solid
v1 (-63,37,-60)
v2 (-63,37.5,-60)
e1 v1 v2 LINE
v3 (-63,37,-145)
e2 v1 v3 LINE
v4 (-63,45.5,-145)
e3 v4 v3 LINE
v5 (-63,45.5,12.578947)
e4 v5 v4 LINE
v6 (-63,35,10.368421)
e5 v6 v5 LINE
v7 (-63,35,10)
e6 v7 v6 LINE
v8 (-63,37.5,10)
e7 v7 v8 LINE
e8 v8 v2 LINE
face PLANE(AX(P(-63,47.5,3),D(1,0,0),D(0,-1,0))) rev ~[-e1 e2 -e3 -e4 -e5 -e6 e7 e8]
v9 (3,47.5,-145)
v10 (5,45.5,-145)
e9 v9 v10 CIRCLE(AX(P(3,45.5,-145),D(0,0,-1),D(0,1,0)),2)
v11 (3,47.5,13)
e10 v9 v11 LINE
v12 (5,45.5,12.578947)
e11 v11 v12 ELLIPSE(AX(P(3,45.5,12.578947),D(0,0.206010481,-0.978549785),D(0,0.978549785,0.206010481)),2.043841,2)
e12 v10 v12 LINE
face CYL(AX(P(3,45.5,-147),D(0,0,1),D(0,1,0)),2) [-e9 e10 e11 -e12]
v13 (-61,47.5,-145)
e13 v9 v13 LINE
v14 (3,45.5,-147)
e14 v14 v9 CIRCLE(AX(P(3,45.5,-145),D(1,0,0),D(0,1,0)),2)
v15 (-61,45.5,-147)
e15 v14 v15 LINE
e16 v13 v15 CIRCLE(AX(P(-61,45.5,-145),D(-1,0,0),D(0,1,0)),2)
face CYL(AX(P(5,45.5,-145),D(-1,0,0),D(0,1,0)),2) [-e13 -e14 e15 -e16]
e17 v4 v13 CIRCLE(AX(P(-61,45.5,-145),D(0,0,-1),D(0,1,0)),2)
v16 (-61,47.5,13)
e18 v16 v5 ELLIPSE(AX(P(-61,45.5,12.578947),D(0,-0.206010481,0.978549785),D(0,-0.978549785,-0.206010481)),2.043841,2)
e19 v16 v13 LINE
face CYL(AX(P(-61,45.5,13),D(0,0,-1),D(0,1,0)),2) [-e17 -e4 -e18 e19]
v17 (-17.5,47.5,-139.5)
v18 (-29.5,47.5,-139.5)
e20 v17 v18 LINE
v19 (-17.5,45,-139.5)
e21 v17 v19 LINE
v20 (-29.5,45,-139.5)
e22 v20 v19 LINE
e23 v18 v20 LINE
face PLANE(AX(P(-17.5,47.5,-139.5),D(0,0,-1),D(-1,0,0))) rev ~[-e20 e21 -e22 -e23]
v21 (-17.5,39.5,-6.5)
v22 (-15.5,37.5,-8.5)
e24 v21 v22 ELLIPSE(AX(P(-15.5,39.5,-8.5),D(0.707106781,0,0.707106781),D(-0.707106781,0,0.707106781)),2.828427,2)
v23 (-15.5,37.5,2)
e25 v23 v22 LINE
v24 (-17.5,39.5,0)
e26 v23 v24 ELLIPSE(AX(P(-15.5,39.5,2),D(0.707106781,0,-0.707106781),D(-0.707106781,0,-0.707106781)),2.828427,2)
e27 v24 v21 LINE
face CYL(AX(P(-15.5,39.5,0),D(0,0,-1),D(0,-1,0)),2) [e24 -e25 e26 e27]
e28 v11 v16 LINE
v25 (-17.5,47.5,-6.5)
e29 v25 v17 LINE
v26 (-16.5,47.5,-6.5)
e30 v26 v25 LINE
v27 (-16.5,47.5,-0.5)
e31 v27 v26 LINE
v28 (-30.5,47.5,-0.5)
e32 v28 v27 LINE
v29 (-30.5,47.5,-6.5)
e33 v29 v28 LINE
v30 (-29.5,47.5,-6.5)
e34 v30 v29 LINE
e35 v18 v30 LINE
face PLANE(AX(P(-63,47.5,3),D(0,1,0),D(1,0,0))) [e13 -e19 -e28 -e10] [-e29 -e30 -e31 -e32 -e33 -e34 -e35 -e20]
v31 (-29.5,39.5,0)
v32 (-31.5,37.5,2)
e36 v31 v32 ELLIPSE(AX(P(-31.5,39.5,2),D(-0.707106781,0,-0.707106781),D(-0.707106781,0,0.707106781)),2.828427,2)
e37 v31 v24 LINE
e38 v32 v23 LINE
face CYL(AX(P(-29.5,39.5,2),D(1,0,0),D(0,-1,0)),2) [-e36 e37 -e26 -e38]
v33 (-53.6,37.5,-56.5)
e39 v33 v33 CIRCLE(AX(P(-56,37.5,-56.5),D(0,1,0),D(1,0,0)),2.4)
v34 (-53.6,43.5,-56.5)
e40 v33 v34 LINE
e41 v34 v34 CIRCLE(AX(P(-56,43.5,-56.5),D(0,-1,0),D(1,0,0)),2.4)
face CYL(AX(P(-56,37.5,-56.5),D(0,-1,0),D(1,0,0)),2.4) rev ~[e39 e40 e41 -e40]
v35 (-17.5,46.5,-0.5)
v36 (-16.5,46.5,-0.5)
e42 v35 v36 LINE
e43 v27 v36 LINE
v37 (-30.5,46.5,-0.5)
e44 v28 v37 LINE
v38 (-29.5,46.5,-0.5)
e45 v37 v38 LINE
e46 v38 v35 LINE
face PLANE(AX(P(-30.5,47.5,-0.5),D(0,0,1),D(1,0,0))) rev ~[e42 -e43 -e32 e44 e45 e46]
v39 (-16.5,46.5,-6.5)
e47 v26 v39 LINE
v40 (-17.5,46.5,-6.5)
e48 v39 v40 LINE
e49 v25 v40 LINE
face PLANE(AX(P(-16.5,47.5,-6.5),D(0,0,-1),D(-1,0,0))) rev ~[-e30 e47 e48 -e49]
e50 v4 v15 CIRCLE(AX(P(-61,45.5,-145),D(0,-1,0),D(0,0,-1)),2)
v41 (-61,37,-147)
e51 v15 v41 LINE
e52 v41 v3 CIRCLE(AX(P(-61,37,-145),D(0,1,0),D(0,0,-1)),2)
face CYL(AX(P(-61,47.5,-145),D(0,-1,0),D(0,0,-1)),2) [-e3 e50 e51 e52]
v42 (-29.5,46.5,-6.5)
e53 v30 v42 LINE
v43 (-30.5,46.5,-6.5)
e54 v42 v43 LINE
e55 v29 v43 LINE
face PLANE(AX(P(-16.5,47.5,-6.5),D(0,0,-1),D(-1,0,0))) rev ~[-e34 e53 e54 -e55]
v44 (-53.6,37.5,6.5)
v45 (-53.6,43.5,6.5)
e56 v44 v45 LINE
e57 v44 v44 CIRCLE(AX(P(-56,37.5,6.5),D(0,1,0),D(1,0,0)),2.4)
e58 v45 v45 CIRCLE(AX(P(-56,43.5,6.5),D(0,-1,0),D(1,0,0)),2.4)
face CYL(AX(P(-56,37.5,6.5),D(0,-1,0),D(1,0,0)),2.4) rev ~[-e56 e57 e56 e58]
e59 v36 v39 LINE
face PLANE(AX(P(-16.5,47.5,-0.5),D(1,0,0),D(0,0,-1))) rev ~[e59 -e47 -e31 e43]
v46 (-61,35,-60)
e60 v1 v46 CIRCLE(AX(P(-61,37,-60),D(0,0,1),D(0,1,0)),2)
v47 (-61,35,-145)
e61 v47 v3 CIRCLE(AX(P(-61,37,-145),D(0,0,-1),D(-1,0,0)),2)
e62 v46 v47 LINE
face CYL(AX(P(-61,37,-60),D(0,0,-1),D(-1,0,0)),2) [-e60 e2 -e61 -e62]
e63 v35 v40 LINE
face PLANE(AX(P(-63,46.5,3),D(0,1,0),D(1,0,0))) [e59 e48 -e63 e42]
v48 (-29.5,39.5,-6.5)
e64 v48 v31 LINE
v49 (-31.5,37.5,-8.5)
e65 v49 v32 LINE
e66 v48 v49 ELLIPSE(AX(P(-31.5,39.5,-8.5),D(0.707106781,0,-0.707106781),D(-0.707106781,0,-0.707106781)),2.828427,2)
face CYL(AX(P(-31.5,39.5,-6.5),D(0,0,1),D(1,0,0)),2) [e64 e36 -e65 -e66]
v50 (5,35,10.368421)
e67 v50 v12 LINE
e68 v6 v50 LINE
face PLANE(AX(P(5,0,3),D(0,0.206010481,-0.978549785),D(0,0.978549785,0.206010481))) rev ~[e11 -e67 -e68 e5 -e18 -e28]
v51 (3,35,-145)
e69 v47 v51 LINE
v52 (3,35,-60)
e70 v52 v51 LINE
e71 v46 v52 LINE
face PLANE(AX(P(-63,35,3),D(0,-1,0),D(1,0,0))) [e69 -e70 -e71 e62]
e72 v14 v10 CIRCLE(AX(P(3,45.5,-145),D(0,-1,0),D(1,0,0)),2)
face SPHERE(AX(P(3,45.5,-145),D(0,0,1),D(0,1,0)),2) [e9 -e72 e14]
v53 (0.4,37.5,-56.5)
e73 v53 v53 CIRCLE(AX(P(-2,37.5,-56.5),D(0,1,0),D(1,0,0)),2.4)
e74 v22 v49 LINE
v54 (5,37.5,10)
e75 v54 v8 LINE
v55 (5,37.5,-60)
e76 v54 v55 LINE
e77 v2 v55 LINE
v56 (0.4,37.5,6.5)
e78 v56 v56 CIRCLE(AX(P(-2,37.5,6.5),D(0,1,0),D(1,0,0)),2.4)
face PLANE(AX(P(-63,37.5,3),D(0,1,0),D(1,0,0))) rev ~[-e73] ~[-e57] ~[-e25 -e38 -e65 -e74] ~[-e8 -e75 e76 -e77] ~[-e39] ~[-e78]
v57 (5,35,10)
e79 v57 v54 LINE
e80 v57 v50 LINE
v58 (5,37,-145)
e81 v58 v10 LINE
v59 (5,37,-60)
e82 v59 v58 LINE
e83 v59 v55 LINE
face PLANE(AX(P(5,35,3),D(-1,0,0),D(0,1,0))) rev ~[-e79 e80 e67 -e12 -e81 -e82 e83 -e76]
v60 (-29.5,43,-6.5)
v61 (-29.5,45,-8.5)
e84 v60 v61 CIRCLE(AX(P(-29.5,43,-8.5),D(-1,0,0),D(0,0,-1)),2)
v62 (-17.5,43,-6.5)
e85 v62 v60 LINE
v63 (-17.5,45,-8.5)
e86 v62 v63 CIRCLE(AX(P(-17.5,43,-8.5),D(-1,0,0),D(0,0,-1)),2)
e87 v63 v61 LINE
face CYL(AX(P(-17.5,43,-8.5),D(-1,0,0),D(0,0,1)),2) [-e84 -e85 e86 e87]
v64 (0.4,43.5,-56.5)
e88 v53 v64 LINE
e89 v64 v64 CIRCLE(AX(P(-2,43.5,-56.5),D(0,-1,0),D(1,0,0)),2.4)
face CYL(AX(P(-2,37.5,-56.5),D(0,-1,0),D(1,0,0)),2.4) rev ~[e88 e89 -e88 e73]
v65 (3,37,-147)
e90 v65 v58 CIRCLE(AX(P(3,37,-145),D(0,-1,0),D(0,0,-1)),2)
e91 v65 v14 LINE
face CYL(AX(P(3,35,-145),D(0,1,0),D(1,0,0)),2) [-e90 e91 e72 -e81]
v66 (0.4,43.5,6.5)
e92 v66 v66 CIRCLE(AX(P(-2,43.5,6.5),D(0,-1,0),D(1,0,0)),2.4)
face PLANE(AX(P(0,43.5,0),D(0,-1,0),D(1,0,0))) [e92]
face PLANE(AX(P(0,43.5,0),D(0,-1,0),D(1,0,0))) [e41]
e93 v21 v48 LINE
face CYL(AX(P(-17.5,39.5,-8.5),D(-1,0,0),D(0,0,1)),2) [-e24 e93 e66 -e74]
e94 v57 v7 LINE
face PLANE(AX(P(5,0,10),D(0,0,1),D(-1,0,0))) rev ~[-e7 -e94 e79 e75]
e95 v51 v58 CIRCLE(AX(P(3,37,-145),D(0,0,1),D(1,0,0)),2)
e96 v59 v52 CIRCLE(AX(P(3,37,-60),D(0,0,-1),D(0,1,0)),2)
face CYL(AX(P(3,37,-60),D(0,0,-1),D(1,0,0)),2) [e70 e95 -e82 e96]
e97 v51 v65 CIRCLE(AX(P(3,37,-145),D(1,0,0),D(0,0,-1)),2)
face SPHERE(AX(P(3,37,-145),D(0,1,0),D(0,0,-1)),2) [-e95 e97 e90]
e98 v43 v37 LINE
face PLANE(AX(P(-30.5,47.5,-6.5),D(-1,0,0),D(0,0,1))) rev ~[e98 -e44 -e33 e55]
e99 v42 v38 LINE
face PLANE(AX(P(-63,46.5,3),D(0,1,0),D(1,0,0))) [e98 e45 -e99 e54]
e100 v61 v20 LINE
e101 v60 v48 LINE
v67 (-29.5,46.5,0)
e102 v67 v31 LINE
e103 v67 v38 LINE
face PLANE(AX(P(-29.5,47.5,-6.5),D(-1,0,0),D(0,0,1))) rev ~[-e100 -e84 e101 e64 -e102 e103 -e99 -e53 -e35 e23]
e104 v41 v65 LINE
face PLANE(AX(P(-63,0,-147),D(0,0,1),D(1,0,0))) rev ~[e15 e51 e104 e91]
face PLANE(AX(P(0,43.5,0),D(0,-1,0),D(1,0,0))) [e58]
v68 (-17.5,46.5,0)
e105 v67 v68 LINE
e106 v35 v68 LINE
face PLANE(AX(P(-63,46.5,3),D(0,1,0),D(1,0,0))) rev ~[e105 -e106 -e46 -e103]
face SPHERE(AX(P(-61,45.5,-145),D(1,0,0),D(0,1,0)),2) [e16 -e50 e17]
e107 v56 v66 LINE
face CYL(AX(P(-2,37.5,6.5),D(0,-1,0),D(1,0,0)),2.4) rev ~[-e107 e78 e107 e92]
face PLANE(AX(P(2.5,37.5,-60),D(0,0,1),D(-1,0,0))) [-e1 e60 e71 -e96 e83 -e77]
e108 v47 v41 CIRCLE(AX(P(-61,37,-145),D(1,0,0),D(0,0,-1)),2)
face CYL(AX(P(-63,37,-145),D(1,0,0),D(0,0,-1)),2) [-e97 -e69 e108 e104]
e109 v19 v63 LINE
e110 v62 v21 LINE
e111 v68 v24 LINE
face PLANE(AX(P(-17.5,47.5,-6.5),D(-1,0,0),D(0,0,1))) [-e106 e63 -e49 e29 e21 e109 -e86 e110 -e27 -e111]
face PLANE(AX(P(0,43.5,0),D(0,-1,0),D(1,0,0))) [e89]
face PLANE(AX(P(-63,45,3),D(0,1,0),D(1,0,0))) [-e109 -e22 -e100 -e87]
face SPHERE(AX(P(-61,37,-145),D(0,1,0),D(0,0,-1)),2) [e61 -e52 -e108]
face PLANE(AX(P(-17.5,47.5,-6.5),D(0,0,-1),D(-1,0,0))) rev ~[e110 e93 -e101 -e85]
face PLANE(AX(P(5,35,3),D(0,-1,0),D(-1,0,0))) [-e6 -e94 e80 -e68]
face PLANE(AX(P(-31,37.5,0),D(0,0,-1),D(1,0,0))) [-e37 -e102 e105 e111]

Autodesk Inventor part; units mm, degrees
ref_plane "YZ Plane" through (0, 0, 0) normal (1, 0, 0) x (0, 1, 0)
ref_plane "XZ Plane" through (0, 0, 0) normal (0, 1, 0) x (-1, 0, 0)
ref_plane "XY Plane" through (0, 0, 0) normal (0, 0, 1) x (1, 0, 0)
sketch "Эскиз1" plane through (0, 0, 0) normal (0, 1, 0) x (-1, 0, 0)
  line L0 (0, -50) -> (58, -50)
  line L1 (-2, -2) -> (-2, -48)
  line L2 (58, 0) -> (0, 0)
  line L3 (60, -48) -> (60, -2)
  line L4 (-2, 0) -> (60, 0)
  line L5 (60, 0) -> (60, -50)
  line L6 (60, -50) -> (-2, -50)
  line L7 (-2, -50) -> (-2, 0)
  circle A0 centre (2, -4) radius 1.6
  circle A1 centre (55, -4) radius 1.6
  circle A2 centre (55, -46) radius 1.6
  circle A3 centre (2, -46) radius 1.6
  circle A4 centre (2, -4) radius 1.6
  circle A5 centre (55, -4) radius 1.6
  circle A6 centre (55, -46) radius 1.6
  circle A7 centre (2, -46) radius 1.6
  circle A8 centre (2, -4) radius 2.4
  circle A9 centre (2, -4) radius 4
  circle A10 centre (55, -4) radius 4
  circle A11 centre (55, -4) radius 2.4
  circle A12 centre (55, -46) radius 4
  circle A13 centre (55, -46) radius 2.4
  circle A14 centre (2, -46) radius 4
  circle A15 centre (2, -46) radius 2.4
  dimension "d0" = 4.8
  dimension "d1" = 8
  dimension "d2" = 4.8
  dimension "d3" = 8
  dimension "d4" = 4.8
  dimension "d5" = 8
  dimension "d6" = 4.8
  dimension "d7" = 8
extrude "Выдавливание1" add sketch "Эскиз1" along normal blind 2.5 contours L6 L7 L1 A14 L0 | A12 | A10 | A14 L1 A9 L2 L4 L5 L3 L6 L0 | A14 | L1 L7 L4 L2 A9 | A9 | A0 | A1 | A2 | A3 | A8 | A11 | A13 | A15
extrude "Выдавливание2" add sketch "Эскиз1" along normal blind 8.5 contours A12 | A10 | A14 | A9
sketch "Эскиз2" plane through (0, 0, 0) normal (0, -1, 0) x (1, 0, 0)
  line L0 (-60, 0) -> (2, 0) projected
  line L1 (2, 0) -> (2, -50) projected
  line L2 (2, -50) -> (-60, -50) projected
  line L3 (-60, -50) -> (-60, 0) projected
  line L4 (2, 0) -> (2, -50) projected
  line L5 (2.5, -50.5) -> (-60.5, -50.5)
  line L6 (-60.5, -50.5) -> (-60.5, 0.5)
  line L7 (-60.5, 0.5) -> (2.5, 0.5)
  line L8 (2.5, 0.5) -> (2.5, -50.5)
  line L9 (5, -50.5) -> (5, -53)
  line L10 (5, -53) -> (2.5, -53)
  line L11 (5, -53) -> (-63, -53)
  line L12 (-63, -53) -> (-63, 3)
  line L13 (-63, 3) -> (5, 3)
  line L14 (5, 3) -> (5, -53)
  point P0 (0, 0)
  dimension "d14" = 63
  dimension "d15" = 51
  dimension "d16" = 2.5
  dimension "d17" = 2.5
  dimension "d18" = 68
  dimension "d19" = 56
extrude "Выдавливание3" add sketch "Эскиз2" against normal blind 2.5 contours L5 L6 L7 L8
extrude "Выдавливание4" add sketch "Эскиз2" against normal blind 35 contours L9 L10 L11 L12 L13 L14
sketch "Эскиз3" plane through (-63, 0, 3) normal (0, 0, 1) x (1, 0, 0)
  line L0 (0, 0) -> (0, 35) projected
  line L1 (0, 35) -> (68, 35)
  line L2 (68, 35) -> (68, 50)
  line L3 (68, 50) -> (0, 50)
  line L4 (0, 50) -> (0, 35)
  point P0 (63, 0)
  dimension "d24" = 15
extrude "Выдавливание5" add sketch "Эскиз3" against normal blind 150
sketch "Эскиз4" plane through (-63, 50, 3) normal (0, 1, 0) x (1, 0, 0)
  line L0 (0, 0) -> (0, 56) projected
  line L1 (68, 0) -> (68, 150) projected
  line L2 (0, 0) -> (68, 0)
  line L3 (68, 0) -> (68, 150)
  line L4 (68, 150) -> (0, 150)
  line L5 (0, 150) -> (0, 0)
  point P0 (63, 3)
extrude "Выдавливание6" cut sketch "Эскиз4" against normal blind 2.5
sketch "Эскиз5" plane through (-63, 47.5, 3) normal (0, 1, 0) x (1, 0, 0)
  line L0 (0, 56) -> (0, 150) projected
  line L1 (0, 150) -> (10, 150)
  line L2 (10, 150) -> (10, 140)
  line L3 (10, 140) -> (0, 140)
  line L4 (0, 140) -> (0, 150)
  line L5 (68, 150) -> (0, 150) projected
  line L6 (68, 150) -> (58, 150)
  line L7 (58, 150) -> (58, 140)
  line L8 (58, 140) -> (68, 140)
  line L9 (68, 140) -> (68, 150)
  line L10 (0, 0) -> (0, 56) projected
  line L11 (0, 0) -> (10, 0)
  line L12 (10, 0) -> (10, 10)
  line L13 (10, 10) -> (0, 10)
  line L14 (0, 10) -> (0, 0)
  line L15 (10, 10) -> (58, 10)
  line L16 (58, 10) -> (58, 140)
  line L17 (58, 140) -> (10, 140)
  line L18 (10, 140) -> (10, 10)
  point P0 (63, 3)
  dimension "d29" = 10
  dimension "d30" = 10
  dimension "d31" = 10
  dimension "d32" = 10
  dimension "d33" = 10
  dimension "d34" = 10
extrude "Выдавливание7" cut sketch "Эскиз5" against normal blind 10 contours L17 L16 L15 L18
sketch "Эскиз6" plane through (-63, 37.5, 3) normal (0, 1, 0) x (1, 0, 0)
  line L0 (58, 140) -> (10, 140) projected
  line L1 (10, 140) -> (10, 10) projected
  line L2 (10, 10) -> (58, 10) projected
  line L3 (58, 10) -> (58, 140) projected
  line L4 (0, 150) -> (68, 150) projected
  line L5 (68, 150) -> (68, 0) projected
  line L6 (68, 0) -> (0, 0) projected
  line L7 (0, 0) -> (0, 150) projected
  line L8 (68, 56) -> (0, 56) projected
  line L9 (0, 56) -> (10, 56)
  line L10 (10, 56) -> (10, 46)
  line L11 (10, 46) -> (0, 46)
  line L12 (0, 46) -> (0, 56)
  line L13 (10, 46) -> (58, 46)
  line L14 (58, 46) -> (58, 10)
  line L15 (58, 10) -> (10, 10)
  line L16 (10, 10) -> (10, 46)
  point P0 (63, 3)
  dimension "d37" = 10
  dimension "d38" = 10
extrude "Выдавливание8" cut sketch "Эскиз6" against normal blind 10 contours L3 L2 L1 L13
sketch "Эскиз7" plane through (-63, 47.5, 3) normal (0, 1, 0) x (1, 0, 0)
  line L0 (0, 0) -> (0, 150) projected
  line L1 (0, 150) -> (2.5, 150)
  line L2 (2.5, 150) -> (2.5, 147.5)
  line L3 (2.5, 147.5) -> (0, 147.5)
  line L4 (0, 147.5) -> (0, 150)
  line L5 (68, 150) -> (68, 0) projected
  line L6 (68, 150) -> (65.5, 150)
  line L7 (65.5, 150) -> (65.5, 147.5)
  line L8 (65.5, 147.5) -> (68, 147.5)
  line L9 (68, 147.5) -> (68, 150)
  line L10 (2.5, 2.5) -> (2.5, 53.5) projected
  line L11 (65.5, 147.5) -> (2.5, 147.5)
  line L12 (2.5, 147.5) -> (2.5, 10)
  line L13 (2.5, 10) -> (65.5, 10)
  line L14 (65.5, 10) -> (65.5, 147.5)
  point P0 (63, 3)
  dimension "d41" = 2.5
  dimension "d42" = 2.5
  dimension "d43" = 2.5
  dimension "d44" = 2.5
  dimension "d45" = 137.5
extrude "Выдавливание9" cut sketch "Эскиз7" against normal blind 10 contours L11 L14 L13 L10 L12
sketch "Эскиз8" plane through (-63, 37.5, 3) normal (0, 1, 0) x (1, 0, 0)
  line L0 (58, 10) -> (58, 46) projected
  line L1 (58, 46) -> (10, 46) projected
  line L2 (10, 46) -> (10, 10) projected
  line L3 (2.5, 10) -> (10, 10) projected
  line L4 (2.5, 147.5) -> (2.5, 10) projected
  line L5 (65.5, 147.5) -> (2.5, 147.5) projected
  line L6 (65.5, 10) -> (65.5, 147.5) projected
  line L7 (58, 10) -> (65.5, 10) projected
  line L8 (10, 10) -> (58, 10) projected
  line L9 (0, 150) -> (68, 150) projected
  line L10 (68, 150) -> (68, 0) projected
  line L11 (68, 0) -> (0, 0) projected
  line L12 (0, 0) -> (0, 150) projected
  circle A0 centre (8, 49) radius 2.4 projected
  line L13 (2.5, 53.5) -> (65.5, 53.5) projected
  line L14 (65.5, 147.5) -> (65.5, 10) projected
  circle A1 centre (61, 49) radius 4 projected
  circle A2 centre (8, 7) radius 4 projected
  circle A3 centre (8, 49) radius 4 projected
  line L15 (2.5, 2.5) -> (65.5, 2.5) projected
  line L16 (65.5, 2.5) -> (65.5, 53.5) projected
  line L17 (65.5, 53.5) -> (2.5, 53.5) projected
  line L18 (2.5, 53.5) -> (2.5, 2.5) projected
  circle A4 centre (61, 7) radius 4 projected
  circle A5 centre (8, 7) radius 4 projected
  line L19 (2.5, 2.5) -> (2.5, 53.5) projected
  line L20 (65.5, 2.5) -> (2.5, 2.5) projected
  line L21 (65.5, 53.5) -> (65.5, 2.5) projected
  circle A6 centre (61, 7) radius 2.4 projected
  line L22 (2.5, 53.5) -> (65.5, 53.5)
  line L23 (65.5, 53.5) -> (65.5, 2.5)
  line L24 (65.5, 2.5) -> (2.5, 2.5)
  line L25 (2.5, 2.5) -> (2.5, 53.5)
  point P0 (63, 3)
  point P1 (58.3542, 10)
  point P2 (63.6458, 10)
  point P3 (10.6458, 10)
  point P4 (10, 10.4641)
  point P5 (10, 45.5359)
  point P6 (10.6458, 46)
extrude "Выдавливание10" cut sketch "Эскиз8" along normal mid plane 20 contours L0 L1 A3 L2 A2 L3 L4 L13 L6 L7 A4 | L7 A4 L16 L15 L18 L3 A2 L8 | A4 L7 | L7 A4 | A2 L3 L8 | L8 L2 A2 | A3 L2 L1 | L1 L2 A3 | L3 A2 L2 | A0 | A1 | A6
sketch "Эскиз9" plane through (-63, 0, 3) normal (0, 0, 1) x (1, 0, 0)
  line L0 (68, 0) -> (68, 47.5) projected
  line L1 (68, 35) -> (0, 35) projected
  line L2 (68, 47.5) -> (0, 47.5)
  line L3 (0, 47.5) -> (0, 35)
  line L4 (0, 35) -> (68, 35)
  line L5 (68, 35) -> (68, 47.5)
  point P0 (63, 0)
extrude "Выдавливание11" add sketch "Эскиз9" along normal blind 10
sketch "Эскиз12" plane through (-63, 37.5, 3) normal (0, 1, 0) x (1, 0, 0)
  line L0 (65.5, 2.5) -> (65.5, 53.5) projected
  line L1 (65.5, 53.5) -> (55.5, 53.5)
  line L2 (55.5, 53.5) -> (55.5, 63.5)
  line L3 (55.5, 63.5) -> (65.5, 63.5)
  line L4 (65.5, 63.5) -> (65.5, 53.5)
  line L5 (2.5, 53.5) -> (2.5, 2.5) projected
  line L6 (2.5, 53.5) -> (12.5, 53.5)
  line L7 (12.5, 53.5) -> (12.5, 63.5)
  line L8 (12.5, 63.5) -> (2.5, 63.5)
  line L9 (2.5, 63.5) -> (2.5, 53.5)
  point P0 (63, 3)
  dimension "d52" = 10
  dimension "d53" = 10
  dimension "d54" = 10
extrude "Выдавливание12" add sketch "Эскиз12" along normal blind 10
sketch "Эскиз16" plane through (0, 0, 0) normal (0, -1, 0) x (1, 0, 0)
  line L0 (5, -53) -> (5, 3) projected
  line L1 (-63, -53) -> (5, -53) projected
  line L2 (5, 3) -> (-63, 3)
  line L3 (-63, 3) -> (-63, -53)
  line L4 (-63, -53) -> (5, -53)
  line L5 (5, -53) -> (5, 3)
  line L6 (-63, -147) -> (-63, 13) projected
  line L7 (5, -53) -> (-63, -53)
  line L8 (-63, -53) -> (-63, -60)
  line L9 (-63, -60) -> (5, -60)
  line L10 (5, -60) -> (5, -53)
  line L11 (-63, 3) -> (-63, -53) projected
  line L12 (5, -147) -> (5, 13) projected
  line L13 (-63, 3) -> (5, 3)
  line L14 (5, 3) -> (5, 10)
  line L15 (5, 10) -> (-63, 10)
  line L16 (-63, 10) -> (-63, 3)
  point P0 (0, 0)
  dimension "d59" = 7
  dimension "d60" = 7
extrude "Выдавливание13" cut sketch "Эскиз16" against normal blind 37.5
sketch "Эскиз17" plane through (-63, 47.5, 3) normal (0, 1, 0) x (1, 0, 0)
  line L0 (68, -10) -> (0, -10)
  line L1 (0, -10) -> (0, 150)
  line L2 (0, 150) -> (68, 150)
  line L3 (68, 150) -> (68, -10)
  line L4 (45.5, 63.5) -> (45.5, 127.5)
  line L5 (2.5, 147.5) -> (65.5, 147.5) projected
  line L6 (45.5, 127.5) -> (45.5, 132.5)
  line L7 (33.5, 132.5) -> (33.5, 7.5)
  line L8 (33.5, 7.5) -> (45.5, 7.5)
  line L9 (45.5, 7.5) -> (45.5, 63.5)
  line L10 (33.5, 132.5) -> (32, 132.5)
  line L11 (32, 132.5) -> (32, 134)
  line L12 (32, 134) -> (33.5, 134)
  line L13 (33.5, 134) -> (33.5, 132.5)
  line L14 (45.5, 7.5) -> (47, 7.5)
  line L15 (47, 7.5) -> (47, 6)
  line L16 (47, 6) -> (45.5, 6)
  line L17 (45.5, 6) -> (45.5, 7.5)
  line L18 (47, 6) -> (32, 6)
  line L19 (32, 6) -> (32, 134)
  line L20 (47, 134) -> (47, 6)
  line L21 (45.5, 134) -> (45.5, 132.5)
  line L22 (33.5, 132.5) -> (33.5, 134)
  line L23 (47, 134) -> (47, 144)
  line L24 (47, 144) -> (32, 144)
  line L25 (32, 144) -> (32, 134)
  line L26 (33.5, 134) -> (32, 134)
  line L27 (32, 134) -> (32, 144)
  line L28 (32, 144) -> (33.5, 144)
  line L29 (33.5, 144) -> (33.5, 134)
  line L30 (45.5, 134) -> (47, 134)
  line L31 (47, 134) -> (47, 144)
  line L32 (47, 144) -> (45.5, 144)
  line L33 (45.5, 144) -> (45.5, 134)
  line L34 (32, 144) -> (47, 144)
  line L35 (47, 144) -> (47, 142.5)
  line L36 (47, 142.5) -> (32, 142.5)
  line L37 (32, 142.5) -> (32, 144)
  line L38 (32, 6) -> (47, 6)
  line L39 (47, 6) -> (47, 7.5)
  line L40 (47, 7.5) -> (32, 7.5)
  line L41 (32, 7.5) -> (32, 6)
  point P0 (63, 3)
  point P1 (55.5, 63.5)
  point P2 (33.5, 142.5)
  point P3 (45.5, 142.5)
  dimension "d64" = 64
  dimension "d65" = 5
  dimension "d66" = 12
  dimension "d67" = 125
  dimension "d68" = 1.5
  dimension "d69" = 1.5
  dimension "d70" = 1.5
  dimension "d71" = 1.5
  dimension "d72" = 10
  dimension "d73" = 1.5
extrude "Выдавливание14" add sketch "Эскиз17" against normal up to surface (10 mm away) contours L4 L6 L21 L30 L20 L14 L9 | L40 L19 L10 L7 | L33 L36 L23 L30 | L10 L11 L12 L13 | L36 L29 L24 L33 | L33 L24 L23 L36 | L12 L25 L36 L29 | L36 L25 L24 L29
sketch "Эскиз18" plane through (-63, 37.5, 3) normal (0, 1, 0) x (1, 0, 0)
  line L0 (45.5, 142.5) -> (45.5, 7.5) projected
  line L1 (33.5, 142.5) -> (45.5, 142.5)
  line L2 (45.5, 142.5) -> (45.5, 7.5)
  line L3 (45.5, 7.5) -> (33.5, 7.5)
  line L4 (33.5, 7.5) -> (33.5, 142.5)
  point P0 (63, 3)
extrude "Выдавливание15" add sketch "Эскиз18" along normal blind 7.5
sketch "Эскиз19" plane through (-63, 47.5, 3) normal (0, 1, 0) x (1, 0, 0)
  line L0 (68, 150) -> (0, 150) projected
  line L1 (68, 150) -> (68, -10) projected
  line L2 (0, 150) -> (68, 150)
  line L3 (68, 150) -> (68, -10)
  line L4 (68, -10) -> (0, -10)
  line L5 (0, -10) -> (0, 150)
  point P0 (63, 3)
sketch "Эскиз20" plane through (-63, 37.5, 3) normal (0, 1, 0) x (1, 0, 0)
  line L0 (2.5, 147.5) -> (65.5, 147.5) projected
  line L1 (32, 63) -> (32, 7.5) projected
  line L2 (2.5, 147.5) -> (32, 147.5)
  line L3 (32, 147.5) -> (32, 63)
  line L4 (32, 63) -> (2.5, 63)
  line L5 (2.5, 63) -> (2.5, 147.5)
  line L6 (47, 7.5) -> (47, 144) projected
  line L7 (32, 147.5) -> (47, 147.5)
  line L8 (47, 147.5) -> (47, 144)
  line L9 (47, 144) -> (32, 144)
  line L10 (32, 144) -> (32, 147.5)
  line L11 (47, 147.5) -> (65.5, 147.5)
  line L12 (65.5, 147.5) -> (65.5, 63)
  line L13 (65.5, 63) -> (47, 63)
  line L14 (47, 63) -> (47, 147.5)
  point P0 (63, 3)
extrude "Выдавливание16" add sketch "Эскиз20" along normal blind 10
sketch "Эскиз21" plane through (-63, 47.5, 3) normal (0, 1, 0) x (1, 0, 0)
  line L0 (12.5, 63) -> (32, 63) projected
  line L1 (65.5, 2.5) -> (2.5, 2.5) projected
  line L2 (32, 63) -> (2.5, 63)
  line L3 (2.5, 63) -> (2.5, 2.5)
  line L4 (2.5, 2.5) -> (32, 2.5)
  line L5 (32, 2.5) -> (32, 63)
  line L6 (47, 63) -> (55.5, 63) projected
  line L7 (65.5, 53.5) -> (65.5, 2.5) projected
  line L8 (47, 63) -> (65.5, 63)
  line L9 (65.5, 63) -> (65.5, 2.5)
  line L10 (65.5, 2.5) -> (47, 2.5)
  line L11 (47, 2.5) -> (47, 63)
  line L12 (32, 2.5) -> (47, 2.5)
  line L13 (47, 2.5) -> (47, 5.5)
  line L14 (47, 5.5) -> (32, 5.5)
  line L15 (32, 5.5) -> (32, 2.5)
  point P0 (63, 3)
  dimension "d80" = 3
extrude "Выдавливание17" add sketch "Эскиз21" against normal blind 10
sketch "Эскиз22" plane through (0, 37.5, 0) normal (0, -1, 0) x (1, 0, 0)
  line L0 (-16, -4.5) -> (-16, -2.5) projected
  line L1 (-16, -2.5) -> (-31, -2.5)
  line L2 (-31, -2.5) -> (-31, 0)
  line L3 (-31, 0) -> (-16, 0)
  line L4 (-16, 0) -> (-16, -2.5)
  point P0 (0, 0)
extrude "Выдавливание18" cut sketch "Эскиз22" against normal blind 10
sketch "Эскиз23" plane through (-63, 47.5, 3) normal (0, 1, 0) x (1, 0, 0)
  line L0 (33.5, 7.5) -> (45.5, 7.5) projected
  line L1 (45.5, 142.5) -> (45.5, 7.5) projected
  line L2 (33.5, 7.5) -> (45.5, 7.5)
  line L3 (45.5, 7.5) -> (45.5, 9.5)
  line L4 (45.5, 9.5) -> (33.5, 9.5)
  line L5 (33.5, 9.5) -> (33.5, 7.5)
  point P0 (63, 3)
  dimension "d85" = 2
extrude "Выдавливание19" cut sketch "Эскиз23" against normal blind 10
sketch "Эскиз24" plane through (-63, 47.5, 3) normal (0, 1, 0) x (1, 0, 0)
  line L0 (32, 7.5) -> (33.5, 7.5) projected
  line L1 (47, 3) -> (32, 3) projected
  line L2 (33.5, 7.5) -> (32, 7.5)
  line L3 (32, 7.5) -> (32, 3)
  line L4 (32, 3) -> (33.5, 3)
  line L5 (33.5, 3) -> (33.5, 7.5)
  line L6 (45.5, 7.5) -> (47, 7.5) projected
  line L7 (45.5, 7.5) -> (47, 7.5)
  line L8 (47, 7.5) -> (47, 3)
  line L9 (47, 3) -> (45.5, 3)
  line L10 (45.5, 3) -> (45.5, 7.5)
  point P0 (63, 3)
extrude "Выдавливание20" add sketch "Эскиз24" against normal blind 10
sketch "Эскиз25" plane through (-63, 47.5, 3) normal (0, 1, 0) x (1, 0, 0)
  line L0 (33.5, 3) -> (33.5, 142.5) projected
  line L1 (45.5, 142.5) -> (45.5, 3) projected
  line L2 (33.5, 3) -> (45.5, 3)
  line L3 (45.5, 3) -> (45.5, 10.5)
  line L4 (45.5, 10.5) -> (33.5, 10.5)
  line L5 (33.5, 10.5) -> (33.5, 3)
  point P0 (63, 3)
  dimension "d90" = 7.5
extrude "Выдавливание21" add sketch "Эскиз25" against normal blind 1
sketch "Эскиз26" plane through (0, 37.5, 0) normal (0, -1, 0) x (1, 0, 0)
  point P0 (0, 0)
sketch "Эскиз27" plane through (0, 37.5, 0) normal (0, -1, 0) x (1, 0, 0)
  line L0 (-29.5, 0) -> (-29.5, -6.5) projected
  line L1 (-29.5, -6.5) -> (-17.5, -6.5) projected
  line L2 (-17.5, -6.5) -> (-17.5, 0) projected
  line L3 (-17.5, 0) -> (-29.5, 0) projected
  line L4 (-63, -60) -> (5, -60) projected
  line L5 (5, 10) -> (5, -60) projected
  line L6 (5, 13) -> (5, 10) projected
  line L7 (-63, 13) -> (5, 13) projected
  line L8 (-63, 10) -> (-63, 13) projected
  line L9 (5, 10) -> (-63, 10) projected
  line L10 (-63, -60) -> (-63, 10) projected
  line L11 (-63, -147) -> (-63, -60) projected
  line L12 (5, -147) -> (-63, -147) projected
  line L13 (5, -60) -> (5, -147) projected
  line L14 (5, 10) -> (-2, 10)
  line L15 (-2, 10) -> (-2, 3)
  line L16 (-2, 3) -> (5, 3)
  line L17 (5, 3) -> (5, 10)
  line L18 (-63, 10) -> (-56, 10)
  line L19 (-56, 10) -> (-56, 3)
  line L20 (-56, 3) -> (-63, 3)
  line L21 (-63, 3) -> (-63, 10)
  line L22 (-63, -60) -> (-56, -60)
  line L23 (-56, -60) -> (-56, -53)
  line L24 (-56, -53) -> (-63, -53)
  line L25 (-63, -53) -> (-63, -60)
  line L26 (5, -60) -> (-63, -60) projected
  line L27 (5, -60) -> (-2, -60)
  line L28 (-2, -60) -> (-2, -53)
  line L29 (-2, -53) -> (5, -53)
  line L30 (5, -53) -> (5, -60)
  circle A0 centre (-2, -56.5) radius 2.4
  circle A1 centre (-56, -56.5) radius 2.4
  circle A2 centre (-56, 6.5) radius 2.4
  circle A3 centre (-2, 6.5) radius 2.4
  point P0 (0, 0)
  dimension "d93" = 7
  dimension "d94" = 7
  dimension "d95" = 7
  dimension "d96" = 7
  dimension "d97" = 4.8
extrude "Выдавливание22" cut sketch "Эскиз27" against normal blind 6 contours A1 L23 | L23 A1 | A0 L28 | L28 A0 | A2 L19 | L19 A2 | A3 L15 | L15 A3
sketch "Эскиз28" plane through (5, 35, -147) normal (1, 0, 0) x (0, 0, -1)
  line L0 (-160, 0) -> (-160, 12.5)
  line L1 (-150, -35) -> (-160, 0)
  line L2 (-150, -35) -> (-160, 12.5)
  line L3 (-160, 0) -> (-150, -35)
  line L4 (-160, 12.5) -> (-160, 0) projected
  line L5 (0, 12.5) -> (-160, 12.5) projected
  point P0 (-147, -35)
extrude "Выдавливание23" cut sketch "Эскиз28" against normal through all
fillet "Сопряжение1" radius 2 8 edges at (5, 47.5, -67) (-29, 47.5, -147) (-63, 47.5, -67) (5, 41.25, -147) (-63, 41.25, -147) (-29, 35, -147) (5, 35, -103.5) (-63, 35, -103.5)
fillet "Сопряжение2" radius 2 1 edges at (-23.5, 45, -6.5)
fillet "Сопряжение3" radius 2 4 edges at (-23.5, 37.5, -6.5) (-17.5, 37.5, -3.25) (-29.5, 37.5, -3.25) (-23.5, 37.5, 0)
sketch "Эскиз29" plane through (0, 37.5, 0) normal (0, -1, 0) x (1, 0, 0)
  line L0 (-31.5, -8.5) -> (-29.5, -6.5) projected
  line L1 (-31.5, -8.5) -> (-31.5, -28.5)
  line L2 (-31.5, -28.5) -> (-15.5, -28.5)
  line L3 (-15.5, -28.5) -> (-15.5, -22.5)
  line L4 (-15.5, -22.5) -> (-31.5, -22.5)
  line L5 (-31.5, -28.5) -> (-28.5, -28.5)
  line L6 (-28.5, -28.5) -> (-28.5, -22.5)
  line L7 (-28.5, -22.5) -> (-31.5, -22.5)
  line L8 (-31.5, -22.5) -> (-31.5, -28.5)
  point P0 (0, 0)
  dimension "d105" = 20
  dimension "d106" = 3
extrude "Выдавливание24" add sketch "Эскиз29" along normal blind 5 contours L4 L6 L2 L1
sketch "Эскиз30" plane through (0, 32.5, 0) normal (0, -1, 0) x (1, 0, 0)
  line L0 (-31.5, -28.5) -> (-31.5, -22.5) projected
  line L1 (-31.5, -28.5) -> (-16.5, -28.5)
  line L2 (-16.5, -28.5) -> (-16.5, -22.5)
  line L3 (-16.5, -22.5) -> (-31.5, -22.5)
  line L4 (-31.5, -22.5) -> (-31.5, -28.5)
  point P0 (0, 0)
  dimension "d109" = 15
extrude "Выдавливание25" add sketch "Эскиз30" against normal blind 2
fillet "Сопряжение4" radius 1 13 edges at (-28.5, 37.5, -25.5) (-30, 37.5, -22.5) (-31.5, 37.5, -25.5) (-30, 37.5, -28.5) (-31.5, 32.5, -25.5) (-24, 32.5, -22.5) (-24, 32.5, -28.5) (-16.5, 32.5, -25.5) (-28.5, 34.5, -25.5) (-31.5, 35, -22.5) (-28.5, 36, -22.5) (-28.5, 36, -28.5) (-31.5, 35, -28.5)
sketch "Эскиз31" plane through (-63, 47.5, 3) normal (0, 1, 0) x (1, 0, 0)
  line L0 (45.5, 3) -> (45.5, 10.5) projected
  line L1 (33.5, 9.5) -> (33.5, 3) projected
  line L2 (45.5, 10.5) -> (33.5, 10.5)
  line L3 (33.5, 10.5) -> (33.5, 5.5)
  line L4 (33.5, 5.5) -> (45.5, 5.5)
  line L5 (45.5, 5.5) -> (45.5, 10.5)
  point P0 (63, 3)
  point P1 (45.5, 5.5)
  dimension "d113" = 5
extrude "Выдавливание26" cut sketch "Эскиз31" against normal blind 2
sketch "Эскиз32" plane through (-63, 47.5, 3) normal (0, 1, 0) x (1, 0, 0)
  line L0 (33.5, 5.5) -> (45.5, 5.5) projected
  line L1 (32.5, 3.5) -> (46.5, 3.5)
  line L2 (46.5, 3.5) -> (46.5, 9.5)
  line L3 (46.5, 9.5) -> (32.5, 9.5)
  line L4 (32.5, 9.5) -> (32.5, 3.5)
  point P0 (63, 3)
  dimension "d118" = 14
extrude "Выдавливание27" cut sketch "Эскиз32" against normal blind 1
sketch "Эскиз33" plane through (0, 32.5, 0) normal (0, -1, 0) x (1, 0, 0)
  line L0 (-35.6143, -40.4907) -> (-11.0678, -40.4907)
  line L1 (-11.0678, -40.4907) -> (-11.0678, -15.5059)
  line L2 (-11.0678, -15.5059) -> (-35.6143, -15.5059)
  line L3 (-35.6143, -15.5059) -> (-35.6143, -40.4907)
  point P0 (0, 0)
extrude "Выдавливание28" cut sketch "Эскиз33" against normal up to surface (5 mm away)
properties part number "Temp"
